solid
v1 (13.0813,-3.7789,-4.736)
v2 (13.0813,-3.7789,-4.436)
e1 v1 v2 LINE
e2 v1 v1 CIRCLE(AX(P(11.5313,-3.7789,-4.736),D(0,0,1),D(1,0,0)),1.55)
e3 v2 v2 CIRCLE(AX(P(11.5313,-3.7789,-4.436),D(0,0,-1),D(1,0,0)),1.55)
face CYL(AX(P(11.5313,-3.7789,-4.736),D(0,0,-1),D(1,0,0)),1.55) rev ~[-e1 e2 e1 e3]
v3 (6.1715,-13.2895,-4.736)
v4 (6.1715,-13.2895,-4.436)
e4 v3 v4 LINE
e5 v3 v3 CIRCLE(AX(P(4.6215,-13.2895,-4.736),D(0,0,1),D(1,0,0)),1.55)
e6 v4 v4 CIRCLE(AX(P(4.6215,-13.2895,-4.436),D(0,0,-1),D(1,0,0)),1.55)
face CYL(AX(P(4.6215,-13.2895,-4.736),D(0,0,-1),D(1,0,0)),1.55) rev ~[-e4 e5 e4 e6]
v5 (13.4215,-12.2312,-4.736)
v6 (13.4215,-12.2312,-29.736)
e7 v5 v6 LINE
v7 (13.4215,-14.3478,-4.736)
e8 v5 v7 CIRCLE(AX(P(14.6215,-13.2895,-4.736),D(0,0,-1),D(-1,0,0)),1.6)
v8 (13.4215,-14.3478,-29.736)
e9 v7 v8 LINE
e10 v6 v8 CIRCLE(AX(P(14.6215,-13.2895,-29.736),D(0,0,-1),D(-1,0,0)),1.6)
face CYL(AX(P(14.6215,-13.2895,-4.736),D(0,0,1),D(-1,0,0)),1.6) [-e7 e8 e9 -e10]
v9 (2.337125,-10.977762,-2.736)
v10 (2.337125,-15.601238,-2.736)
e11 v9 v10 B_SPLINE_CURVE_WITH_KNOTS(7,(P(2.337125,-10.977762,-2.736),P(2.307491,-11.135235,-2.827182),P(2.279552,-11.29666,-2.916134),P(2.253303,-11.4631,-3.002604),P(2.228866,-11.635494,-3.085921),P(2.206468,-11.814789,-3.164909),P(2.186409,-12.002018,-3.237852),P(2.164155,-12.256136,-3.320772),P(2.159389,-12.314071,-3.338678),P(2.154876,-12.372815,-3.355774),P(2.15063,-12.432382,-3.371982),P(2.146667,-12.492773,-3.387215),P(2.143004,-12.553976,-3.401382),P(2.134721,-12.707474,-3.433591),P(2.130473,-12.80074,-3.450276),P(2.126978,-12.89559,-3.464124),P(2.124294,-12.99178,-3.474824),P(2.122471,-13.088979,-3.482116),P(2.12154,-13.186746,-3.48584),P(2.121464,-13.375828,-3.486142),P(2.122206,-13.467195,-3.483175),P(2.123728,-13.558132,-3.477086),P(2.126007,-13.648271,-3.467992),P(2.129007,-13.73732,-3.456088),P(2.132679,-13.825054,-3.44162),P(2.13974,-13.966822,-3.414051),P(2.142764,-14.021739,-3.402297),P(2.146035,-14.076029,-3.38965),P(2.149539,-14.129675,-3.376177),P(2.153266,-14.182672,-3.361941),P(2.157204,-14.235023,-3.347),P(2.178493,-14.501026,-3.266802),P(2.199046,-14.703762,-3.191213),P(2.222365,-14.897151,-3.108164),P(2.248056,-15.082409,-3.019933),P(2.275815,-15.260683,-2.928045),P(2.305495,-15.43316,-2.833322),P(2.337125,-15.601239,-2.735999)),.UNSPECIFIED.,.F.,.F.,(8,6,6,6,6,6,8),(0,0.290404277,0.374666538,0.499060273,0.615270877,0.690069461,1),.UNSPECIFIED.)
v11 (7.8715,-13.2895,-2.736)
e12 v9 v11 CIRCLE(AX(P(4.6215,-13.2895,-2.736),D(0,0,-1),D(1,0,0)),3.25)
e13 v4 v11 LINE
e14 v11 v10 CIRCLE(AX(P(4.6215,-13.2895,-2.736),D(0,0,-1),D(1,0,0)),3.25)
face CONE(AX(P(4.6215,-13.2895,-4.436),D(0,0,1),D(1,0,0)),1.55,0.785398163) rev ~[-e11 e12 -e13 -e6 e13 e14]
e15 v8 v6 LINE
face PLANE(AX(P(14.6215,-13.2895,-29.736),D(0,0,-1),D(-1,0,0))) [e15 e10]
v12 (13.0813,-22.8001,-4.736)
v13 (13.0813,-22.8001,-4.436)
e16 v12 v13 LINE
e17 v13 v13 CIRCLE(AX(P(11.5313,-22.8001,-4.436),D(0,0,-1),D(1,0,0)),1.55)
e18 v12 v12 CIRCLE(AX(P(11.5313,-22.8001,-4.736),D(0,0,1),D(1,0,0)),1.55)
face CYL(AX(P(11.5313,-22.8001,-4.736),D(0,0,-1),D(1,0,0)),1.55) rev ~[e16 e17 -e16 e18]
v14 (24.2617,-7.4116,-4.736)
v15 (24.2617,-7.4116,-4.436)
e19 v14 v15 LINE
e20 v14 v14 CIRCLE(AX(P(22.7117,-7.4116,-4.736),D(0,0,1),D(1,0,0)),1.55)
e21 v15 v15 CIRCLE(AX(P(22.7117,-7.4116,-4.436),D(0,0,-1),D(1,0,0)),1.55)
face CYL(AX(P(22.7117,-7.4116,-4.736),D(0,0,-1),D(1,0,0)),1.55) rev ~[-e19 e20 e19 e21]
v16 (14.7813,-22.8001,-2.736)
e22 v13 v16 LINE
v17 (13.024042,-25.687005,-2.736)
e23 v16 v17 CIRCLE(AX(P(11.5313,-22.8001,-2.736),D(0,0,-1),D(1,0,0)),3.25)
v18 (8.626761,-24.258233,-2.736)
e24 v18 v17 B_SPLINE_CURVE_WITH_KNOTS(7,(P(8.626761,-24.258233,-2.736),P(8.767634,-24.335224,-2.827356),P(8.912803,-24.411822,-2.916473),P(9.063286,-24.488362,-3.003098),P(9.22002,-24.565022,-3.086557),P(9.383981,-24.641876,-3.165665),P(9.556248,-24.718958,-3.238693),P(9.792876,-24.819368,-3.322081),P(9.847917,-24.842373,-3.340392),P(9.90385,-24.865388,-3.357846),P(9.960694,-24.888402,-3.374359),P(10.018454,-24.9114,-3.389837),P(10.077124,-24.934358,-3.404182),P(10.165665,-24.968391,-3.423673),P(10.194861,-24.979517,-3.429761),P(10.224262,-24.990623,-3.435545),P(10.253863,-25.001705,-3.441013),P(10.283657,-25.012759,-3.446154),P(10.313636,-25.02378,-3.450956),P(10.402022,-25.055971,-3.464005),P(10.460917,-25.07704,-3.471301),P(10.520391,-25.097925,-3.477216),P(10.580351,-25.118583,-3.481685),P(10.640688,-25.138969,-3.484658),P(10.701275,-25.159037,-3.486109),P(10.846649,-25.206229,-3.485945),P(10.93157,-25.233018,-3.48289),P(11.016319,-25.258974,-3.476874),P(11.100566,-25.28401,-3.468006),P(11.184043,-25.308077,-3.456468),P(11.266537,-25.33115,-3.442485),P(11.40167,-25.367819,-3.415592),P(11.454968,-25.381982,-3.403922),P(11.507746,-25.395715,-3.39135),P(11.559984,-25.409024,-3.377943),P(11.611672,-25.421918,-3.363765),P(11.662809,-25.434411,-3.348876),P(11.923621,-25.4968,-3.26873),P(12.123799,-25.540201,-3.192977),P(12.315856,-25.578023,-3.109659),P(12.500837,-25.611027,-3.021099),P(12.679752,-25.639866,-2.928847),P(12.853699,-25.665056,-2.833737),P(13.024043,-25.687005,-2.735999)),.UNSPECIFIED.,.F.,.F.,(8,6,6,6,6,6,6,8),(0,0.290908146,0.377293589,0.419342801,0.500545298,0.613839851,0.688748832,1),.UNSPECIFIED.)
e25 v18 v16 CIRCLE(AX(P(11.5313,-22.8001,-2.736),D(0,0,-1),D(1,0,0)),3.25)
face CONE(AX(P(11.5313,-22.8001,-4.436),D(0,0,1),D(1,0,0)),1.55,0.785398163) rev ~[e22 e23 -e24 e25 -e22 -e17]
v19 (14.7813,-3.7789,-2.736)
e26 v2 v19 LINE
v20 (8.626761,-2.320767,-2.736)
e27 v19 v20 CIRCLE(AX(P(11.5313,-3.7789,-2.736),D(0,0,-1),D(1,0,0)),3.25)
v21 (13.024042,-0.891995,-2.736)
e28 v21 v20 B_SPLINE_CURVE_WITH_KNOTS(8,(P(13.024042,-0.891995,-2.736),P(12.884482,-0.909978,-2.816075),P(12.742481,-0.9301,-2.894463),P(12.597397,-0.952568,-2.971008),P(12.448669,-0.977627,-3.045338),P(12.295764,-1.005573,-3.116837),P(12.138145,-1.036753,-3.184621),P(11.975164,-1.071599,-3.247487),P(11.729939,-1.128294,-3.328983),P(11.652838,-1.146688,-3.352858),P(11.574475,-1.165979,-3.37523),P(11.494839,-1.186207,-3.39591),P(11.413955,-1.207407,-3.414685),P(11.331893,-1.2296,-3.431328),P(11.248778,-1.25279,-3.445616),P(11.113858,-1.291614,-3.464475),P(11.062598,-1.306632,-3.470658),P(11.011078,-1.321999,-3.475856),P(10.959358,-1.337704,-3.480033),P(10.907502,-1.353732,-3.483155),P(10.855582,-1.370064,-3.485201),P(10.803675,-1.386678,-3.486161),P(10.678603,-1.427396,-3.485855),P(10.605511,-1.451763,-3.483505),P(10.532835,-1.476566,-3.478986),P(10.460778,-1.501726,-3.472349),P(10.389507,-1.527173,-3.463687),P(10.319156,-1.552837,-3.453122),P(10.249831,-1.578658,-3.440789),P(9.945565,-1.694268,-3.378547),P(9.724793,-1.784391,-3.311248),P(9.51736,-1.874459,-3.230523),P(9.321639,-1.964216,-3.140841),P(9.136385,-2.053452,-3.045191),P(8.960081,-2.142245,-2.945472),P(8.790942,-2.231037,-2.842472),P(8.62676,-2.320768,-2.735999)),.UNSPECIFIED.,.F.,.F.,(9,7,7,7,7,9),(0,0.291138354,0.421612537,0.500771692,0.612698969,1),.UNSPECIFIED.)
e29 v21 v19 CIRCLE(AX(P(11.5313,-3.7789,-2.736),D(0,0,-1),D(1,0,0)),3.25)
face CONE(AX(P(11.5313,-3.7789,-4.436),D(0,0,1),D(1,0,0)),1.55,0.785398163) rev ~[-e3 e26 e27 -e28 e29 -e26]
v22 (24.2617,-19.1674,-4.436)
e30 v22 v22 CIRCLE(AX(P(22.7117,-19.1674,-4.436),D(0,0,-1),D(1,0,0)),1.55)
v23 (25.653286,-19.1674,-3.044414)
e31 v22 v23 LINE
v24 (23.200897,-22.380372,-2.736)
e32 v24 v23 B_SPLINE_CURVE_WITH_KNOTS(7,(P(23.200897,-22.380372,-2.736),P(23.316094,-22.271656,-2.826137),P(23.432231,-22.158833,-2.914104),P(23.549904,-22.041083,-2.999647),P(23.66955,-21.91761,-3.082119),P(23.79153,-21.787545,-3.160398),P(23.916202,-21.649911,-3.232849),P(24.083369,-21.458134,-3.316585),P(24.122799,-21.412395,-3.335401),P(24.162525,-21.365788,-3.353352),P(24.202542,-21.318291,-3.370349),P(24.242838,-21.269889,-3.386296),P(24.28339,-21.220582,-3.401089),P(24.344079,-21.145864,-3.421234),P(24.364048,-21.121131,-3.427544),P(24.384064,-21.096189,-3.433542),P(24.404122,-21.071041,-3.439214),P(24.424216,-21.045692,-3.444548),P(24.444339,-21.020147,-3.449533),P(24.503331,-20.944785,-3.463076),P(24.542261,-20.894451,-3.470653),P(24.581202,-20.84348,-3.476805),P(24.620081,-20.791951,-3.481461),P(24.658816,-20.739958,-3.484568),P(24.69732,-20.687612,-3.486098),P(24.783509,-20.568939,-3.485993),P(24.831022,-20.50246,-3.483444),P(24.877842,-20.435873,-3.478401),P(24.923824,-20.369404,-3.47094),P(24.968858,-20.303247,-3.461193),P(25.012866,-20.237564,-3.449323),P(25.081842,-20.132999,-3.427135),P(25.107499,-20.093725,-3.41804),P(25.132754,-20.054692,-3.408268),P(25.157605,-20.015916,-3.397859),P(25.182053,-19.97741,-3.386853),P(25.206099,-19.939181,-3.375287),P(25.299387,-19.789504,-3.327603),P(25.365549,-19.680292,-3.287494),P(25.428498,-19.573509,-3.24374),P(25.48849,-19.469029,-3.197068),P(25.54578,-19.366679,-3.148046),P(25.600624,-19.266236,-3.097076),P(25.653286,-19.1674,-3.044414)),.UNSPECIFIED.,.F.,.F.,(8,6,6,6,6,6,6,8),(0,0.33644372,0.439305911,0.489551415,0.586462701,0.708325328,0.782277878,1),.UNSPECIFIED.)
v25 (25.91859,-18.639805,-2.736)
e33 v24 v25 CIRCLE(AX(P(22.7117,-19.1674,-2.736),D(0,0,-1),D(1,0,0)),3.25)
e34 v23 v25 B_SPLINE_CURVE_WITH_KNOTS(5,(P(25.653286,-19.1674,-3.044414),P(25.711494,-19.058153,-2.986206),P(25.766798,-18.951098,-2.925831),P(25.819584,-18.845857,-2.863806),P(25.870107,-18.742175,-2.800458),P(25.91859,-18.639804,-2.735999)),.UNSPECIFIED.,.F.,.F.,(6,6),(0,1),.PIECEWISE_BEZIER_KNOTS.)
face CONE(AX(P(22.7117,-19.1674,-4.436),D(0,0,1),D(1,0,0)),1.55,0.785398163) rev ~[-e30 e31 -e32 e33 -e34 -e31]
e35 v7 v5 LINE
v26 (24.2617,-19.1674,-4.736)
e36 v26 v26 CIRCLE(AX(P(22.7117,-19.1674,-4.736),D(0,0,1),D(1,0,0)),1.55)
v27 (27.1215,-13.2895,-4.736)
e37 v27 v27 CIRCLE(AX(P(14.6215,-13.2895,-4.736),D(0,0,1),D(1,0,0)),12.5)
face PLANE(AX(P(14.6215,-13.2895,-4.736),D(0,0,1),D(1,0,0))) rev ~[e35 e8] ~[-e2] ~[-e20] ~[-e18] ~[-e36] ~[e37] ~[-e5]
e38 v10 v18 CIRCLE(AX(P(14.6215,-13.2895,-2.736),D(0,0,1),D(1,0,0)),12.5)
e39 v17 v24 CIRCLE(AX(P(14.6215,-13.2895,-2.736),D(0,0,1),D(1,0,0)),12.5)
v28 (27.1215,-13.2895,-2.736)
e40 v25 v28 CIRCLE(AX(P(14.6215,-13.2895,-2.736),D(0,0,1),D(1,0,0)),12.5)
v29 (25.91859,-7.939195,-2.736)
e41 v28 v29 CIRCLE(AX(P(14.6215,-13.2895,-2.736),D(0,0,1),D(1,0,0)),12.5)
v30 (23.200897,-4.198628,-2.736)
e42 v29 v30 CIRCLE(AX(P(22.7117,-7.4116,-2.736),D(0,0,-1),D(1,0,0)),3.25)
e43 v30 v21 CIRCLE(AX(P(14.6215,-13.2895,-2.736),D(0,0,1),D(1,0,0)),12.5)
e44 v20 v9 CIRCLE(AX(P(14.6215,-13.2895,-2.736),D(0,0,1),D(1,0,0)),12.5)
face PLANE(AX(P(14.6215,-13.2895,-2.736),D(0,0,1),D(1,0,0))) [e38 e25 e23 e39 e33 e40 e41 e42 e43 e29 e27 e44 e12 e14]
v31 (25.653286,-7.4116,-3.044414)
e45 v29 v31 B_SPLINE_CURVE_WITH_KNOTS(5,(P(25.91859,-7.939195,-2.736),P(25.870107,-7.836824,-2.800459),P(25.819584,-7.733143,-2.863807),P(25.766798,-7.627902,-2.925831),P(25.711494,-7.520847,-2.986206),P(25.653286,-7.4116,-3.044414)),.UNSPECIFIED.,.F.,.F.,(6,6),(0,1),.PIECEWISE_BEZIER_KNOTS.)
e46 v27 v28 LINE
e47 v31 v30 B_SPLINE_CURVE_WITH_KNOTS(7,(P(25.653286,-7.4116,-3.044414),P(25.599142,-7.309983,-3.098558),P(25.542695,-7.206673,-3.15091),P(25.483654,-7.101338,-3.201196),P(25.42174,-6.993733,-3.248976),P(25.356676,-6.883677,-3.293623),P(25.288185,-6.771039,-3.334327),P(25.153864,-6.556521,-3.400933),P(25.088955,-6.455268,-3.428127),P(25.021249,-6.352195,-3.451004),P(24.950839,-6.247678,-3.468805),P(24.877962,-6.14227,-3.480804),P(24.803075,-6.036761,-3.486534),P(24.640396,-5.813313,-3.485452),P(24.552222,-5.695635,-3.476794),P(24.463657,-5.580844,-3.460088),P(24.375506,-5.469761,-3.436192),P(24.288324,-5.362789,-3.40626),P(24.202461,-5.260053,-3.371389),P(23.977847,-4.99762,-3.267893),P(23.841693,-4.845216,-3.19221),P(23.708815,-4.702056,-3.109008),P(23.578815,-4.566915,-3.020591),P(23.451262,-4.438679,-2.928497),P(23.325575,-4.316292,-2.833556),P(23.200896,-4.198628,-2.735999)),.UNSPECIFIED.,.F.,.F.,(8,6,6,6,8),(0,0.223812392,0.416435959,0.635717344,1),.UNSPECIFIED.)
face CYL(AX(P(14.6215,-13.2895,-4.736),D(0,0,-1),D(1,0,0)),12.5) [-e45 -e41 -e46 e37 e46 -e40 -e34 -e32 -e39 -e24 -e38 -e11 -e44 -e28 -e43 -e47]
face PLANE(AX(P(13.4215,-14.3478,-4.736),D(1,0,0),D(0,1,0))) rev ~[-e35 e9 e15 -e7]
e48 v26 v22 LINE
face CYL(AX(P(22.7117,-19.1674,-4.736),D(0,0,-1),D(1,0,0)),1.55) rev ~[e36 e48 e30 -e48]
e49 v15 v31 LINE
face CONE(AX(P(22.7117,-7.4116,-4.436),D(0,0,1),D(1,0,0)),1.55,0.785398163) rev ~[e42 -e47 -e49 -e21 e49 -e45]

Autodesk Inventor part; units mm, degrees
ref_plane "YZ Plane" through (0, 0, 0) normal (1, 0, 0) x (0, 1, 0)
ref_plane "XZ Plane" through (0, 0, 0) normal (0, 1, 0) x (-1, 0, 0)
ref_plane "XY Plane" through (0, 0, 0) normal (0, 0, 1) x (1, 0, 0)
ref_plane "Work Plane1" through (14.6215, -13.2895, -4.736) normal (0, 0, 1) x (1, 0, 0)
sketch "Sketch1" plane through (14.6215, -13.2895, -4.736) normal (0, 0, 1) x (1, 0, 0)
  circle A0 centre (0, 0) radius 4 projected
  arc A1 (-1.3, -1.0954) -> (-1.3, 1.0954) centre (0, 0) ccw projected
  line L0 (-1.3, -1.0954) -> (-1.3, 1.0954) projected
  circle A2 centre (0, 0) radius 6
  circle A3 centre (0, 0) radius 12.5
  circle A4 centre (0, 0) radius 1.3331
  point P0 (-14.6215, 13.2895)
  dimension "d0" = 12
  dimension "d1" = 25
extrude "Extrusion1" add sketch "Sketch1" along normal blind 2 contours A0 | L0 A4 A1 | A4 L0 | L0 A4 | A2 | A3
sketch "Sketch2" plane through (14.6215, -13.2895, -4.736) normal (0, 0, 1) x (1, 0, 0)
  circle A0 centre (0, 0) radius 4 projected
  arc A1 (-1.3, -1.0954) -> (-1.3, 1.0954) centre (0, 0) ccw projected
  line L0 (-1.3, -1.0954) -> (-1.3, 1.0954) projected
  circle A2 centre (0, 0) radius 6
  circle A3 centre (0, 0) radius 12.5
  circle A4 centre (-10, 0) radius 1.55
  circle A5 centre (-3.0902, -9.5106) radius 1.55
  circle A6 centre (8.0902, -5.8779) radius 1.55
  circle A7 centre (8.0902, 5.8779) radius 1.55
  circle A8 centre (-3.0902, 9.5106) radius 1.55
  point P0 (-14.6215, 13.2895)
  dimension "d4" = 12
  dimension "d5" = 25
  dimension "d6" = 3.1
  dimension "d7" = 10
  dimension "d10" = 360
extrude "Extrusion2" cut sketch "Sketch2" along normal blind 22 contours A4 | A5 | A6 | A7 | A8
chamfer "Chamfer1" distance 1.7 angle 45 5 edges at (9.9813, -3.779, -2.736) (3.0715, -13.2895, -2.736) (21.1616, -7.4117, -2.736) (21.1616, -19.1674, -2.736) (9.9813, -22.8001, -2.736)
sketch "Sketch3" plane through (14.6215, -13.2895, -4.736) normal (0, 0, -1) x (-1, 0, 0)
  circle A0 centre (0, 0) radius 1.6
  line L0 (1.2, -1.0583) -> (1.2, 1.0583)
  point P0 (14.6215, 13.2895)
  point P1 (0.6764, 1.45)
  point P2 (-0.6764, 1.45)
  dimension "d17" = 3.2
  dimension "d21" = 1.2
extrude "Extrusion3" add sketch "Sketch3" along normal blind 25 contours L0 A0 picked at (0.2667, 0)
properties part number "formadol"
